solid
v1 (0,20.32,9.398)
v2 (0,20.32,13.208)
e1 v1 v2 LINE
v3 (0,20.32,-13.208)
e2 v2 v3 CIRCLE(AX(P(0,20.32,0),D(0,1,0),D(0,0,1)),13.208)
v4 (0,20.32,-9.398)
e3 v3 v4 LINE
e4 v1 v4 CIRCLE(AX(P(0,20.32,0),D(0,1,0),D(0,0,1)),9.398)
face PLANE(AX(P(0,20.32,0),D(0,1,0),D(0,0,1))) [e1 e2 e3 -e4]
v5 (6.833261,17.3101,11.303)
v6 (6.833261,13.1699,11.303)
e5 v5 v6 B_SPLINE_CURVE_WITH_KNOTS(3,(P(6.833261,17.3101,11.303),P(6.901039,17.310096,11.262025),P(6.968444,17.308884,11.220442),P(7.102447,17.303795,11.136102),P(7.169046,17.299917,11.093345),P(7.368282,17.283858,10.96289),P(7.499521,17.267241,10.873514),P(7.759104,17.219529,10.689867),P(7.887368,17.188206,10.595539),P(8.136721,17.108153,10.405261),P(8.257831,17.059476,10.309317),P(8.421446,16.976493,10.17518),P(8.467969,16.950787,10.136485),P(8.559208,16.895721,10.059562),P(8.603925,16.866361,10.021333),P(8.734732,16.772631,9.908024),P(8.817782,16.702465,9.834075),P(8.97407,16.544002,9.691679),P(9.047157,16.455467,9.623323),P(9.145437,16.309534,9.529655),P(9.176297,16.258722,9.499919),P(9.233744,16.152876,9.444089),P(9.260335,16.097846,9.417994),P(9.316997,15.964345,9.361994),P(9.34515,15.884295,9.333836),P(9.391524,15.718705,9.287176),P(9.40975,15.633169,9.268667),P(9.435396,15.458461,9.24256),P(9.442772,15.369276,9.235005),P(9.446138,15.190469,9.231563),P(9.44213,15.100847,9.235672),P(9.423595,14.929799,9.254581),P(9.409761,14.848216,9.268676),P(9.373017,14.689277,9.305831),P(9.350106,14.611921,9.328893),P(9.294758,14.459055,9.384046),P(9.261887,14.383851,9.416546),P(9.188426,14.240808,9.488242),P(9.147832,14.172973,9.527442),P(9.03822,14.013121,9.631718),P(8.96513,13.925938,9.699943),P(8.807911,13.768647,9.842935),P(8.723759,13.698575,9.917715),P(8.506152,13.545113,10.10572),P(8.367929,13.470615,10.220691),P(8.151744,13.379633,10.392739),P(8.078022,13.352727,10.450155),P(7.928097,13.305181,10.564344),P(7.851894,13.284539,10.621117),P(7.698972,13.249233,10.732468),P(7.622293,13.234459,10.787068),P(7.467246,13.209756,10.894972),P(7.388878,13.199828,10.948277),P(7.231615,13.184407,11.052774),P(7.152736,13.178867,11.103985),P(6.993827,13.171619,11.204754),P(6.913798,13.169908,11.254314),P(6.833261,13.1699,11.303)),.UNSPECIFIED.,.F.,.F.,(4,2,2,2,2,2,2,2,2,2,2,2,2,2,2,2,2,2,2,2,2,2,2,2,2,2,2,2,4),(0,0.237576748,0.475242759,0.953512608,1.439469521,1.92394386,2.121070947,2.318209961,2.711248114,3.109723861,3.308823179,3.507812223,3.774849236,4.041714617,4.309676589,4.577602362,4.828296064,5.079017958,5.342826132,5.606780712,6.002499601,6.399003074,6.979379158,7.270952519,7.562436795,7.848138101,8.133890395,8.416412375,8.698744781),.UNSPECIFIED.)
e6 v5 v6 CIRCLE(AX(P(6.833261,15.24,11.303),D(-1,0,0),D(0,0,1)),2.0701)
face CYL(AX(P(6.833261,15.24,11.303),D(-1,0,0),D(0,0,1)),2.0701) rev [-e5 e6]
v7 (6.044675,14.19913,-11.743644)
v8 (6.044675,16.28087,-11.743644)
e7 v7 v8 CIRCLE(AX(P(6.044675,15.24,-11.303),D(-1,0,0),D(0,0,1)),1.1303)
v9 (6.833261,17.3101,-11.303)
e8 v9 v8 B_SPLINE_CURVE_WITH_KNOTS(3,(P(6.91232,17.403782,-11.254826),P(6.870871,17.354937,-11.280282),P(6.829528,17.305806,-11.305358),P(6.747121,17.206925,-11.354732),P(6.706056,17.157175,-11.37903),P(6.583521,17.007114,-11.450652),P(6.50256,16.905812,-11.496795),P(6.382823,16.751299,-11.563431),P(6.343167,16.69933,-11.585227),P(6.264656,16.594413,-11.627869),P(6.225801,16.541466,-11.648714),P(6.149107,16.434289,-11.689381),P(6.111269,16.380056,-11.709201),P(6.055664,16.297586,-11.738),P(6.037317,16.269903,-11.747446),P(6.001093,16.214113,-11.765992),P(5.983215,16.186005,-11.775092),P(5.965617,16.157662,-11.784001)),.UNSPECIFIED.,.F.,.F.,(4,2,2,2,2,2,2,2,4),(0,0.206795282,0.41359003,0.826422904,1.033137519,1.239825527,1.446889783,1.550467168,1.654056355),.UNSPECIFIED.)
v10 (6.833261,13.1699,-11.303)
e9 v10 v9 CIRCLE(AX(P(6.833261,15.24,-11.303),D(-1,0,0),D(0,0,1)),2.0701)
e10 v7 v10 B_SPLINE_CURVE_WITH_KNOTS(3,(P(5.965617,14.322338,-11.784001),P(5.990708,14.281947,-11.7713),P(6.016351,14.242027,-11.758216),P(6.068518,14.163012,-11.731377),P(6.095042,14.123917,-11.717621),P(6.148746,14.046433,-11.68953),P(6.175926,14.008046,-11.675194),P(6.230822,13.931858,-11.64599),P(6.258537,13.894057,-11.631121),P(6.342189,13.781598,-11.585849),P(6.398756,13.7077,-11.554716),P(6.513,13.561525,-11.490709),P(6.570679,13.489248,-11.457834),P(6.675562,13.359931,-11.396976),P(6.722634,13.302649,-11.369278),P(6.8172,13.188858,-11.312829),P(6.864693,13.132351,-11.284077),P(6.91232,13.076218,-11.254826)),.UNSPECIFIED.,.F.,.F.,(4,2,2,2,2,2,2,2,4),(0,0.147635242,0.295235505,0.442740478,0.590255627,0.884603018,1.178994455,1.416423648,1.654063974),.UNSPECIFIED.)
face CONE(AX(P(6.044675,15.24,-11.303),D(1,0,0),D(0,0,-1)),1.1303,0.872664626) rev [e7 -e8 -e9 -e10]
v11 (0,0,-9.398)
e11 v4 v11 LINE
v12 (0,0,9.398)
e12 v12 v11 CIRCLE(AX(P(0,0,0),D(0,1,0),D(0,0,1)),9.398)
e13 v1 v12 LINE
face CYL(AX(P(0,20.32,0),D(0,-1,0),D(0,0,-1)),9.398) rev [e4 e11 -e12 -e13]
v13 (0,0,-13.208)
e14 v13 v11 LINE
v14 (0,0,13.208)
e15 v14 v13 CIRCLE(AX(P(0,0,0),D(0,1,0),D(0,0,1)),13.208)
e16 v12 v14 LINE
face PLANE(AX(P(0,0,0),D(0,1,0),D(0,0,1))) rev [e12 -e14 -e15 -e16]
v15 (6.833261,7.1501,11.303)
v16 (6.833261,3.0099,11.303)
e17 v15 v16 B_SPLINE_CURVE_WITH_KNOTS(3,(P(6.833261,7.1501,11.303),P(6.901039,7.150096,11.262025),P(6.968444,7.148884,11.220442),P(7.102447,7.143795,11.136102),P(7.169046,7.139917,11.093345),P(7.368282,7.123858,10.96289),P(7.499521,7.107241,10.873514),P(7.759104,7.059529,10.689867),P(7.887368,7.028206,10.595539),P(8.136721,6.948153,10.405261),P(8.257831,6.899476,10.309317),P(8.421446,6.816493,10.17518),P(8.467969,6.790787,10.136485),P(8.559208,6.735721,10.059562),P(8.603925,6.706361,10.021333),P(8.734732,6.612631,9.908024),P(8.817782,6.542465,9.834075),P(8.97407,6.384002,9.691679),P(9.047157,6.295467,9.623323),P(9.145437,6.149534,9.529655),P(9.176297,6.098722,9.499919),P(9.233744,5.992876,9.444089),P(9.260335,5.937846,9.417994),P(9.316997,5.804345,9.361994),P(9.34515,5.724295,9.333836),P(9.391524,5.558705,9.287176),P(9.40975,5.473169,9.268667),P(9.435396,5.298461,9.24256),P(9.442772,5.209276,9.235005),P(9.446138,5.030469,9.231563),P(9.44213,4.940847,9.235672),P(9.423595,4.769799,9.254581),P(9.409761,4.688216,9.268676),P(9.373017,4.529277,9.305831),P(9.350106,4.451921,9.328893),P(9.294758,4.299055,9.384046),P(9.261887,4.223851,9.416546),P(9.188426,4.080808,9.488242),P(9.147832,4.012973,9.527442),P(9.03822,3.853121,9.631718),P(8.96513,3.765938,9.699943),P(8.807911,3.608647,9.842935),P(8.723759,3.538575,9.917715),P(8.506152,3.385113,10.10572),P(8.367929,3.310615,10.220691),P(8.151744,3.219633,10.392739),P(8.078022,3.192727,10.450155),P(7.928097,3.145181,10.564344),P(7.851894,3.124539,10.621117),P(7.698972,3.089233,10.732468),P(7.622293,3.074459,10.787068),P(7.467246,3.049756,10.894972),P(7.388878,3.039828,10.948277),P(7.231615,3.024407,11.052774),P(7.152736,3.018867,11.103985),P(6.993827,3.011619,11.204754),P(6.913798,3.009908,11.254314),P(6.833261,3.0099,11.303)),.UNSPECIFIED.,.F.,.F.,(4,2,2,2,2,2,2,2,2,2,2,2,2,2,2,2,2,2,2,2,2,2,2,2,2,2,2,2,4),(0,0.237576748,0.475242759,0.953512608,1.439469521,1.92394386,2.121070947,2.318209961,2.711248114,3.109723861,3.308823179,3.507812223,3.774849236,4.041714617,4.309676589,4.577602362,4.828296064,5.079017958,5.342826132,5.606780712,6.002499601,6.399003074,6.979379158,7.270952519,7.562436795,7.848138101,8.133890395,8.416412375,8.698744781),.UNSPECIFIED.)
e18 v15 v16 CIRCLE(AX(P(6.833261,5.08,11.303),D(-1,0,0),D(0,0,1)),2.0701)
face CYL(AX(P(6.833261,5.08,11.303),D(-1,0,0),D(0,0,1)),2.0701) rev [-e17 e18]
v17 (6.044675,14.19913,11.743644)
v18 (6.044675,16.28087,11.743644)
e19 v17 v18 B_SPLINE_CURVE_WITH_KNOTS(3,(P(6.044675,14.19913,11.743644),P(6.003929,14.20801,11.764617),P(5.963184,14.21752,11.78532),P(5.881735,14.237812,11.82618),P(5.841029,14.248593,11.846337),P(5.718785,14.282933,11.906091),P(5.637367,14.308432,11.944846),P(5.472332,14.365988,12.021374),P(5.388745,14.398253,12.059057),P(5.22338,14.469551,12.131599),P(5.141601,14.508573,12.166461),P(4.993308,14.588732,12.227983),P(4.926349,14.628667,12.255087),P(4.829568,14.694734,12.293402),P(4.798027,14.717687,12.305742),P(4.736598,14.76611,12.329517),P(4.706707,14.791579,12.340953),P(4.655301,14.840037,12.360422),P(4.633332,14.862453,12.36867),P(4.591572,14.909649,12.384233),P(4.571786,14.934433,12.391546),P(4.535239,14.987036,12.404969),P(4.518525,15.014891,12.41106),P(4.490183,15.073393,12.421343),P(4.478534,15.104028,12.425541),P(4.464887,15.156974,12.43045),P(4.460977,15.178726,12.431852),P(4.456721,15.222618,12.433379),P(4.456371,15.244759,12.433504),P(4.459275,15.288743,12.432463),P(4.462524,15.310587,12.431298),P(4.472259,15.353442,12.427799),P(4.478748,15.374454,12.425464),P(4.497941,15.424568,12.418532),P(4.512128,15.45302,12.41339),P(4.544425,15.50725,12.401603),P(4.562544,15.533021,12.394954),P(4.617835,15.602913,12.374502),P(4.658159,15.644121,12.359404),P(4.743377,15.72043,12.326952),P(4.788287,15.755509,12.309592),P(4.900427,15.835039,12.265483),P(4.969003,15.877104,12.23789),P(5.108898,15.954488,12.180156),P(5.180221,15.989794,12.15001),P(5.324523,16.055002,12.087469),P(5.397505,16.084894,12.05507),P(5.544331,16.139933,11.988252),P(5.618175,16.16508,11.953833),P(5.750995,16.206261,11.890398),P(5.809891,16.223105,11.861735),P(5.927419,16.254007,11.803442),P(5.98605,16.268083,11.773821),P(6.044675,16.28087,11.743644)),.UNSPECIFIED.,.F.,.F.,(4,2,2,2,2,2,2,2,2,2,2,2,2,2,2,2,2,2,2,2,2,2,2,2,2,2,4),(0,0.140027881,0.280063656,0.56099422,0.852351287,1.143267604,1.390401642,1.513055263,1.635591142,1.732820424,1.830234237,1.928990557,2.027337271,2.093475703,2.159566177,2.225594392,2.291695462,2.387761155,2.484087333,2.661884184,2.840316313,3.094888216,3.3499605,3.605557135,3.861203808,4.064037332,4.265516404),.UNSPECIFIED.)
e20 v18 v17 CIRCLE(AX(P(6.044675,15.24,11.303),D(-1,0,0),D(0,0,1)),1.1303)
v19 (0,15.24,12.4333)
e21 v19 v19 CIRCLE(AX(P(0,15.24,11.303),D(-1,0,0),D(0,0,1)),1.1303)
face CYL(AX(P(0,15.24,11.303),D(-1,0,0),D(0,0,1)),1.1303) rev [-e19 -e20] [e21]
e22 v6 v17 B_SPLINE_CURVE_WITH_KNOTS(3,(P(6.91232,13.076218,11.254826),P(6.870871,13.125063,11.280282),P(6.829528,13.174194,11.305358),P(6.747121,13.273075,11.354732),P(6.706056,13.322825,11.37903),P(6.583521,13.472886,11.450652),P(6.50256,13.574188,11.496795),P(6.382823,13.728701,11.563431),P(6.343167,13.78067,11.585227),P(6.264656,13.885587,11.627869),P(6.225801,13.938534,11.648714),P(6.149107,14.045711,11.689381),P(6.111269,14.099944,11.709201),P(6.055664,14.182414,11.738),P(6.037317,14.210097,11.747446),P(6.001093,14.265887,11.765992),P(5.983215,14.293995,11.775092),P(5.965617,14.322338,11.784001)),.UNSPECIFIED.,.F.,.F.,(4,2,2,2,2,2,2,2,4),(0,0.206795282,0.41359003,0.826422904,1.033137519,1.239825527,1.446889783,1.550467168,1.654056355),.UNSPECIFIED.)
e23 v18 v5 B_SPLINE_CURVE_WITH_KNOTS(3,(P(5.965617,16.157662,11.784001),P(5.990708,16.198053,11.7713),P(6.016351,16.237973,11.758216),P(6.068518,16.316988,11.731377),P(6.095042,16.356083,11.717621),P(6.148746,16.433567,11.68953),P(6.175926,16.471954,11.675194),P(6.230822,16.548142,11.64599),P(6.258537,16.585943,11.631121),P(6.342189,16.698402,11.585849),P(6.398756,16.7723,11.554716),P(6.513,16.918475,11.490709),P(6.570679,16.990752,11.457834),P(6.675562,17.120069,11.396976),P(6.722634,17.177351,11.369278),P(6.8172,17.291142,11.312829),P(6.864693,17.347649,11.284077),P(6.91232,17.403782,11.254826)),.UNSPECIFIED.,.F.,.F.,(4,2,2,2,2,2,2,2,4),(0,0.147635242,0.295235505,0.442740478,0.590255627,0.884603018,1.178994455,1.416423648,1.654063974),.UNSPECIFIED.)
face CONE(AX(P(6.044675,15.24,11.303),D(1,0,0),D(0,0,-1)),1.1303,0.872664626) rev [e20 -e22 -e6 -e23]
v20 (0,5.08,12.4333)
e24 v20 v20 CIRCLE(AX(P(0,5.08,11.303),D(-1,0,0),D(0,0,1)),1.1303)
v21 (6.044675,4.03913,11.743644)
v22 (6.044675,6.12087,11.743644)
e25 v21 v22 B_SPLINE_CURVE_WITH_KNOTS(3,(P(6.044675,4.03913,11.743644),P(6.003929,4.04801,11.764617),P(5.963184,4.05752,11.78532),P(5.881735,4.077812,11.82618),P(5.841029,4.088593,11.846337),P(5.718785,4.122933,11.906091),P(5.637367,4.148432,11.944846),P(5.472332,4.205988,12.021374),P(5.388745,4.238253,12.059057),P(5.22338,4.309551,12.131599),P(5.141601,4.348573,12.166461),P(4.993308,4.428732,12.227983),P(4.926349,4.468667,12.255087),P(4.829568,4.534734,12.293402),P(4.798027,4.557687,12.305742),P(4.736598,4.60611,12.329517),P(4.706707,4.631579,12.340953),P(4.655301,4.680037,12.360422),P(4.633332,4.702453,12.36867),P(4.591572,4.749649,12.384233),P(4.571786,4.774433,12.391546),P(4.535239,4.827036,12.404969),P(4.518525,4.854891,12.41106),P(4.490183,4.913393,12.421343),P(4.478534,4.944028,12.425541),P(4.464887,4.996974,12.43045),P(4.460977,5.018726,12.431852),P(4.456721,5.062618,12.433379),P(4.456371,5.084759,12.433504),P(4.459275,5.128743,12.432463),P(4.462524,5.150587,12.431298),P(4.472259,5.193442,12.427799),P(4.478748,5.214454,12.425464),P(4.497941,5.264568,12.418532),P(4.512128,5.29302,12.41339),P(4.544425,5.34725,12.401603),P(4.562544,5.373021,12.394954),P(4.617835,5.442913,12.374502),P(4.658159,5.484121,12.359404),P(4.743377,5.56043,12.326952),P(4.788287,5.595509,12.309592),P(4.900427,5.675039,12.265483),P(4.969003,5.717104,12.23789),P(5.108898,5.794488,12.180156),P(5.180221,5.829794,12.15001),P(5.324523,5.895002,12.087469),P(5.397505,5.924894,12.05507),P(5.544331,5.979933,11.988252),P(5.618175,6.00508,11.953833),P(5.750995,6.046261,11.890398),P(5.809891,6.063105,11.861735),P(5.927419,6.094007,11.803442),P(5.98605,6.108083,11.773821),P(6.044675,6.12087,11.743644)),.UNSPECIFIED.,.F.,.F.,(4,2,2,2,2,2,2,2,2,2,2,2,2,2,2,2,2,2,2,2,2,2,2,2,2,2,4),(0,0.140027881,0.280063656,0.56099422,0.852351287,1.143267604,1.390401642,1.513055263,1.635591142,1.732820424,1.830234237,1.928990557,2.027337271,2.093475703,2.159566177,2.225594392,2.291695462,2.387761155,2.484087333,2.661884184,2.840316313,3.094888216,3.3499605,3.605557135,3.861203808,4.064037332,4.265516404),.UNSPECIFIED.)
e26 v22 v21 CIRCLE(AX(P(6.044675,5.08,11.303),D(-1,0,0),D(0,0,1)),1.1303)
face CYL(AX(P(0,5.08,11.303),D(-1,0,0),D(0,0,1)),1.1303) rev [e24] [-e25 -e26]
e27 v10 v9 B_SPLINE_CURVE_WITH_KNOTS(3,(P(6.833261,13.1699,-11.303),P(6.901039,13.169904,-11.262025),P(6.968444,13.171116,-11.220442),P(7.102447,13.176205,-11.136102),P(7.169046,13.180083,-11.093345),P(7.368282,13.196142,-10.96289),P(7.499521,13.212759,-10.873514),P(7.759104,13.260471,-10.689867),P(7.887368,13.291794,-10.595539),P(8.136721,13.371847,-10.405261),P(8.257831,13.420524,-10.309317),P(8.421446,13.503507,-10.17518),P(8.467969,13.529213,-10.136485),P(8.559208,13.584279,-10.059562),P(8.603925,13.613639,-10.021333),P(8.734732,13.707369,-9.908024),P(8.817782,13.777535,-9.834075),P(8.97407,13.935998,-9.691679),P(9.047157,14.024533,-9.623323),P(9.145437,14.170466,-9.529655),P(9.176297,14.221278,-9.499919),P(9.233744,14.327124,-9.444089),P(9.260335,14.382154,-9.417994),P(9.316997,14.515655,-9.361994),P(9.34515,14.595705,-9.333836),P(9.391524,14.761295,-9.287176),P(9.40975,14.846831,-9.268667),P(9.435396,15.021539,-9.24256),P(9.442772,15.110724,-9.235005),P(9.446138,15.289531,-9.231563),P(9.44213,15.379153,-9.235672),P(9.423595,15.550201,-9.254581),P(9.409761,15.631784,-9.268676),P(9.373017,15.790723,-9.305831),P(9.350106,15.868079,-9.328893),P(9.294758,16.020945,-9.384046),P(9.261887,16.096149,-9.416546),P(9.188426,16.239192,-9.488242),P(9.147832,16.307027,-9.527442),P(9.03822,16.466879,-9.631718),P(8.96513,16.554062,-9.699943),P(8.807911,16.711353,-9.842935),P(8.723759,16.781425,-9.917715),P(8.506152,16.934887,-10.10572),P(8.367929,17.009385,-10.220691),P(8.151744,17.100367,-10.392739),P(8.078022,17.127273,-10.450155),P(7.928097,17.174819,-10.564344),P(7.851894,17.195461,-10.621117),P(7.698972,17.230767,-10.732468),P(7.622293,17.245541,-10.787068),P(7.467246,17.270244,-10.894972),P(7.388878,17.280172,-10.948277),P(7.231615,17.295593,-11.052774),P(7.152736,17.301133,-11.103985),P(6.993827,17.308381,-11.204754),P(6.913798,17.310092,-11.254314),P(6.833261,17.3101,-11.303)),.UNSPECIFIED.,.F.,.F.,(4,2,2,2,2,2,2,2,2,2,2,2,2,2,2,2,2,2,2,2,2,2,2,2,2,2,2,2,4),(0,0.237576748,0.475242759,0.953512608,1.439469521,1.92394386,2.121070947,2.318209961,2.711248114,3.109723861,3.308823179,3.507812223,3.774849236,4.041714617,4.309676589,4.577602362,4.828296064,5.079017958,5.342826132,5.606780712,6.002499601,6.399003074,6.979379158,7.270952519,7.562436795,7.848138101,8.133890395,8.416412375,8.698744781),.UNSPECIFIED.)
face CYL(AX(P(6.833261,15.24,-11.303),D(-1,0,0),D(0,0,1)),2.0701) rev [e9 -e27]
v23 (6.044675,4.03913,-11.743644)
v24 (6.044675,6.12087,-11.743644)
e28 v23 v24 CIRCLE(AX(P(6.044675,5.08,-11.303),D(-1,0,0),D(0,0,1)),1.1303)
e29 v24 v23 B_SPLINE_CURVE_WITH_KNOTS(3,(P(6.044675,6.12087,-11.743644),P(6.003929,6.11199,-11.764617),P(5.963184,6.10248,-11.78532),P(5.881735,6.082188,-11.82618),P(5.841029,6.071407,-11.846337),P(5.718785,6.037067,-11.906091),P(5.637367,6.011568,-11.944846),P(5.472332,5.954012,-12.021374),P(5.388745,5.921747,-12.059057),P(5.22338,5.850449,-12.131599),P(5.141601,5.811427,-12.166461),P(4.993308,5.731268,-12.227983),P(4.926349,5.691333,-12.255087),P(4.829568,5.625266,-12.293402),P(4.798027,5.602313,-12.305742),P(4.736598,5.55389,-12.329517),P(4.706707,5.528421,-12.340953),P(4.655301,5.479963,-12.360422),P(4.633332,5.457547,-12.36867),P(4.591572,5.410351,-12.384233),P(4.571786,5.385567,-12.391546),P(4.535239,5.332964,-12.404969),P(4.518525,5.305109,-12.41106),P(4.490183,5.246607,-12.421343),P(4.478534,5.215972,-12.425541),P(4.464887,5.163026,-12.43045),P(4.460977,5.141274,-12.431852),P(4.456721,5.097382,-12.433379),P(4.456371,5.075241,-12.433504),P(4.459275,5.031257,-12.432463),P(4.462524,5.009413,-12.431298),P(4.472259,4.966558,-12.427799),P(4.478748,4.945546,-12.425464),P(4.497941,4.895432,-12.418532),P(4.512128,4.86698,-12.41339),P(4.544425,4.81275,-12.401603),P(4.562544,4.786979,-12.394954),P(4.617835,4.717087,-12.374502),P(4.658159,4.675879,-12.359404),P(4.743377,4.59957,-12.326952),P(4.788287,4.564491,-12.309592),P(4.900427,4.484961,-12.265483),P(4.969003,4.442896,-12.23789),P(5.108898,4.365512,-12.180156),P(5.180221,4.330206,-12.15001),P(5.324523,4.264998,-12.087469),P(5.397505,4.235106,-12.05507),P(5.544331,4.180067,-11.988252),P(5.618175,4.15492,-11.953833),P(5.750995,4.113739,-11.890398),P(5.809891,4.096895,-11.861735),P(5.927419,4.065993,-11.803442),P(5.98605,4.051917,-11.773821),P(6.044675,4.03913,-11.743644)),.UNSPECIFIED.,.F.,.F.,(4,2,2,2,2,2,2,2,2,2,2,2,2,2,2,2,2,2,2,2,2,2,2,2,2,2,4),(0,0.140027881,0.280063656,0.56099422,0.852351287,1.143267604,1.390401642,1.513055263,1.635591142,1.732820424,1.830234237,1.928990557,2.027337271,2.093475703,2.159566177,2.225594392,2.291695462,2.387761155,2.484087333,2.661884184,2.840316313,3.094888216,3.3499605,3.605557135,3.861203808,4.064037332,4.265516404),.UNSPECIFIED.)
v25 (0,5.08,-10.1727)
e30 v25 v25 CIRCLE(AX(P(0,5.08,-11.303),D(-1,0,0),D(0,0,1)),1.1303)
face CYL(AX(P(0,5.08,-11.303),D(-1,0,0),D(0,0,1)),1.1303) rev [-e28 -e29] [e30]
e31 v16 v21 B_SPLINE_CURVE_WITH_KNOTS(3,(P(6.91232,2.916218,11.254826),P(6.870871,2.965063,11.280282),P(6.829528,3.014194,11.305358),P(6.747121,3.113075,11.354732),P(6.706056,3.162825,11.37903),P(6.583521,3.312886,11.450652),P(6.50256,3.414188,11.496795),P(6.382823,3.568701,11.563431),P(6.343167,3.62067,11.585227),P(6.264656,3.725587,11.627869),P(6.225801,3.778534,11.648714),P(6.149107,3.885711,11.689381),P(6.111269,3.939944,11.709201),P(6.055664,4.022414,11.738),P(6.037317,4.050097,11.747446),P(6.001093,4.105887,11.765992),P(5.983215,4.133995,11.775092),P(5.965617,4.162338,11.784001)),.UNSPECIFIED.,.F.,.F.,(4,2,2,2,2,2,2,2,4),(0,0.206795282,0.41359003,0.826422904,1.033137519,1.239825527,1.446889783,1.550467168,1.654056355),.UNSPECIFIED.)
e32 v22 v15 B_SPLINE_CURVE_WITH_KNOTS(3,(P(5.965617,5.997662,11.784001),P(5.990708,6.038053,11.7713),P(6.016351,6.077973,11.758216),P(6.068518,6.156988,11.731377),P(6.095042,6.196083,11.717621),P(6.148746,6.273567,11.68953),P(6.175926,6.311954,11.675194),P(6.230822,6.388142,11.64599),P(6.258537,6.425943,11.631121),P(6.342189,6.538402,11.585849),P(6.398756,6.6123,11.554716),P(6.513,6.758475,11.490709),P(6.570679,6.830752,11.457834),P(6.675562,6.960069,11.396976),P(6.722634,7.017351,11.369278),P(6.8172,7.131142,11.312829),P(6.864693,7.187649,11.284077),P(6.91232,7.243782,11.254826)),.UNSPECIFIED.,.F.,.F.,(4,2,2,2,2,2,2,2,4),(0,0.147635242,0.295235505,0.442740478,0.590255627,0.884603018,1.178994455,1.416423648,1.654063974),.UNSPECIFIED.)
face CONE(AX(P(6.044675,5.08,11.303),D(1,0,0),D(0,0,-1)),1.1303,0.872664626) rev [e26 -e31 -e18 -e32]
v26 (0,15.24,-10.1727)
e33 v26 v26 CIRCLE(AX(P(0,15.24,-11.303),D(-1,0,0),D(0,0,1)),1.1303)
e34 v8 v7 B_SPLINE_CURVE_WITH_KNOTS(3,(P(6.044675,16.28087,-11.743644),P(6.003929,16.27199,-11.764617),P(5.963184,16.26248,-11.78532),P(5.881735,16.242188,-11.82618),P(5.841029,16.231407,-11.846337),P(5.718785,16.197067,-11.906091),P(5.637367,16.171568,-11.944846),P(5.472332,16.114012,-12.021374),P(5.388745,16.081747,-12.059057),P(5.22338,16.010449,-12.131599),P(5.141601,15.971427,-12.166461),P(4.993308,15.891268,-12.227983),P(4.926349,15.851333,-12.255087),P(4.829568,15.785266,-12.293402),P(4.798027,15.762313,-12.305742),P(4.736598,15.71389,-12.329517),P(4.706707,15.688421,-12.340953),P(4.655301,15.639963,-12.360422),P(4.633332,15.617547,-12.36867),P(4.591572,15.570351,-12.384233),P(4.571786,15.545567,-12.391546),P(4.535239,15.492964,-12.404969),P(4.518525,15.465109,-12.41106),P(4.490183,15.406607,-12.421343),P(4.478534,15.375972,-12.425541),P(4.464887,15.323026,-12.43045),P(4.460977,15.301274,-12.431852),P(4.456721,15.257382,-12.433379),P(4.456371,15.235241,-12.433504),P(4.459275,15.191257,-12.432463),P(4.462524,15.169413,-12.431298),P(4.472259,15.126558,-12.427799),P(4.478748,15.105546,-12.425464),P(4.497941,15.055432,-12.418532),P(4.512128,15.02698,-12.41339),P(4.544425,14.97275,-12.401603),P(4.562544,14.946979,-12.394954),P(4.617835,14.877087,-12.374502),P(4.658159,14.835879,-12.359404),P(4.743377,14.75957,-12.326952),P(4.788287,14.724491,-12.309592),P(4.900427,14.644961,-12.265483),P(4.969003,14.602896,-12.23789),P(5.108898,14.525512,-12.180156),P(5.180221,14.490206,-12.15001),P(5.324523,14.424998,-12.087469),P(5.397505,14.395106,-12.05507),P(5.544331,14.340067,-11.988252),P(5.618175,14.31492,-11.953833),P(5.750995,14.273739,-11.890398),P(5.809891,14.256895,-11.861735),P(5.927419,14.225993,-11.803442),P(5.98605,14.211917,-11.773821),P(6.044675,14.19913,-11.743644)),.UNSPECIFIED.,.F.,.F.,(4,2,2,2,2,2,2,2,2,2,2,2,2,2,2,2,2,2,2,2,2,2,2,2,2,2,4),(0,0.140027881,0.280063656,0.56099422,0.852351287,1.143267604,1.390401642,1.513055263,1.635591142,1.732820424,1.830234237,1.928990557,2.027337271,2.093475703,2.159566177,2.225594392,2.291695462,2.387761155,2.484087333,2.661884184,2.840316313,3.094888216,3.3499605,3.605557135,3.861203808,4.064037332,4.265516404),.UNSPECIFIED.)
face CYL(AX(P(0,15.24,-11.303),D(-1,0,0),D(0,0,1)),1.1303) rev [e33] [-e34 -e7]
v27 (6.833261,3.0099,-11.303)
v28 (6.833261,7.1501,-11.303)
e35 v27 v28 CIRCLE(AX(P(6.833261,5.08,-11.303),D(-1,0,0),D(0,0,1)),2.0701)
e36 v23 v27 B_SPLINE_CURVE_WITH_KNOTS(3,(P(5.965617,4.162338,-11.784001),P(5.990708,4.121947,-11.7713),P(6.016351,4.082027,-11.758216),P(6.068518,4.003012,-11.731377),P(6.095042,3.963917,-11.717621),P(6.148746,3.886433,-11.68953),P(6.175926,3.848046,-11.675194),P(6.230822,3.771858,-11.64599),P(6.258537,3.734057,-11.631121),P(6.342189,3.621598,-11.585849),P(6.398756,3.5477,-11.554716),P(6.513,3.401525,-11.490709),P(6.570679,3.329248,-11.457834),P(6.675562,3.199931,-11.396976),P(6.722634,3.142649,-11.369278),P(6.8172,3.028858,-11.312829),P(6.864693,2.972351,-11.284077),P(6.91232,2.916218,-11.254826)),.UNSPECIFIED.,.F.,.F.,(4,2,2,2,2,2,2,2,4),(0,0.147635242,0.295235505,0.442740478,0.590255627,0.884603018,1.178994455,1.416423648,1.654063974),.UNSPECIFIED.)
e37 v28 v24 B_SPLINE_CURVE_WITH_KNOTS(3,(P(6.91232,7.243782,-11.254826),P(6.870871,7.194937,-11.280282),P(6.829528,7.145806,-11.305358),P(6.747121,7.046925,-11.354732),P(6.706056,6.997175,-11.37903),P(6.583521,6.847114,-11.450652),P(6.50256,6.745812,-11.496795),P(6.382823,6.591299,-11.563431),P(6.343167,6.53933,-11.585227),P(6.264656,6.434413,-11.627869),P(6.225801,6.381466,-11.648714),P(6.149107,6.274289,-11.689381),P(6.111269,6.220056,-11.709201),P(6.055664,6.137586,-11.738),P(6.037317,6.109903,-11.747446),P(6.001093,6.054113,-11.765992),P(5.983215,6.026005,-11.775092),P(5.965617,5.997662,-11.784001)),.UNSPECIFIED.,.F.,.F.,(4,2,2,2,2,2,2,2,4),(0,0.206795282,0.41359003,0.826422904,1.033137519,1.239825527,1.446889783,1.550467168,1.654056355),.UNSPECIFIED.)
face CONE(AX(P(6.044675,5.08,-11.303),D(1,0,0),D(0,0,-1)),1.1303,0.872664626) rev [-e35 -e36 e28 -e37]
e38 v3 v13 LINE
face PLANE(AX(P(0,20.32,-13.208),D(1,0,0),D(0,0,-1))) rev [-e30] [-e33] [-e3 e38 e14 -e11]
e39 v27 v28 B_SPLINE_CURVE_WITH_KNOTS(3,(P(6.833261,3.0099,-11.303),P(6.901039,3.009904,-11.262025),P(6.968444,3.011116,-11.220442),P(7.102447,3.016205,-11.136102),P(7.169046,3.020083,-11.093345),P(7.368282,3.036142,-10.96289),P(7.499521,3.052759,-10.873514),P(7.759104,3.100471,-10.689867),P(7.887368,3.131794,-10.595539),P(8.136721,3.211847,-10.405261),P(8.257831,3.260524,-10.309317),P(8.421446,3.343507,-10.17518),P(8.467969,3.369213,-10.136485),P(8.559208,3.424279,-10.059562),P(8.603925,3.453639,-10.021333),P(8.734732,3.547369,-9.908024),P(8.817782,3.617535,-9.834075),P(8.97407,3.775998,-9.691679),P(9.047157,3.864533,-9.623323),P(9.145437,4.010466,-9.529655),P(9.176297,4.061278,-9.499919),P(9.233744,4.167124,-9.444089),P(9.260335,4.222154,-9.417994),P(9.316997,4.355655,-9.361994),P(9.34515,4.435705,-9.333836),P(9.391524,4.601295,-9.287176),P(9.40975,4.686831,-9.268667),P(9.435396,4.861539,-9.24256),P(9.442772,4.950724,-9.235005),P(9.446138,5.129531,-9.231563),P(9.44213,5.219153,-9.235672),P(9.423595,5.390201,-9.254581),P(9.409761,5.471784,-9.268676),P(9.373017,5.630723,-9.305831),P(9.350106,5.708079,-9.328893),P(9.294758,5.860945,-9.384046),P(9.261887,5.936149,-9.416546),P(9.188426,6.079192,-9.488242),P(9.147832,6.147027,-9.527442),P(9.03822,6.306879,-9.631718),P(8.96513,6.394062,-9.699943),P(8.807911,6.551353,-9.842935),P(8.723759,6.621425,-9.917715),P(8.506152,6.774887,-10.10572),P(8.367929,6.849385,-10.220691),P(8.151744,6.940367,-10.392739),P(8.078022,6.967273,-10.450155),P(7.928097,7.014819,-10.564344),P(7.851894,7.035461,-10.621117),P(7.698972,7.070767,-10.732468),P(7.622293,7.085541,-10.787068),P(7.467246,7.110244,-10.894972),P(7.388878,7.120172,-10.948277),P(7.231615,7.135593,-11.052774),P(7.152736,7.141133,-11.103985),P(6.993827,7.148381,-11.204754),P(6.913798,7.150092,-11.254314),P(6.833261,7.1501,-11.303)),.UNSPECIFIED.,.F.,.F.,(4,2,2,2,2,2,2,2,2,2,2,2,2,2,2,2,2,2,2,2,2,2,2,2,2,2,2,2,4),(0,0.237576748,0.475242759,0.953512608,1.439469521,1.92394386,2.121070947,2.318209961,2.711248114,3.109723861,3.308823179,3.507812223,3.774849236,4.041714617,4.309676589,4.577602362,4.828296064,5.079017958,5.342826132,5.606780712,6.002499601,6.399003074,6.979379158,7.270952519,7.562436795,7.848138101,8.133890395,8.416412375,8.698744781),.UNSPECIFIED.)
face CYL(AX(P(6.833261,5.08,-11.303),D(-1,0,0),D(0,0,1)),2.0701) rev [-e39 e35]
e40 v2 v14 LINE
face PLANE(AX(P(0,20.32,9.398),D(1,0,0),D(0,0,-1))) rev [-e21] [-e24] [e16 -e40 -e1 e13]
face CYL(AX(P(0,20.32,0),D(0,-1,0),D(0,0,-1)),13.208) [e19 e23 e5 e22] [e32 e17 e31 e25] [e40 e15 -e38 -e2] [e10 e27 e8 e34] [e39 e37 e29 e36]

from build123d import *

# Parameters (mm, degrees)
BOSS_EXTRUDE1_DEPTH = 20.32


# Read off the part's stored shape, not the designer's step: #2 Clearance Hole1
with BuildPart() as part:
    # Sketch1 → Boss-Extrude1 (new body)
    with BuildSketch(Plane(origin=(0, 0, 0), x_dir=(1, 0, 0), z_dir=(0, 1, 0))):
        with BuildLine():
            Line((0, 13.208), (0, 9.398))
            ThreePointArc((0, 9.398), (9.398, 0), (0, -9.398))
            Line((0, -9.398), (0, -13.208))
            ThreePointArc((0, -13.208), (13.208, 0), (0, 13.208))
        make_face()
    extrude(amount=BOSS_EXTRUDE1_DEPTH)

    # #2 Clearance Hole1 outline → #2 Clearance Hole1 (revolve, cut)
    with BuildSketch(Plane(origin=(0, 5.08, -11.303), x_dir=(0, 1, 0), z_dir=(0, 0, -1))):
        Polygon((2.0701, 6.833260935), (2.0701, 9.445172288), (0, 9.445172288), (0, 0), (1.1303, 0), (1.1303, 6.044675101), align=None)
    revolve(axis=Axis((0, 5.08, -11.303), (1, 0, 0)), mode=Mode.SUBTRACT)

    # 2 Clearance Hole1 2 outline → 2 Clearance Hole1 2 (revolve, cut)
    with BuildSketch(Plane(origin=(0, 5.08, 11.303), x_dir=(0, 1, 0), z_dir=(0, 0, -1))):
        Polygon((2.0701, 9.445172288), (0, 9.445172288), (0, 0), (1.1303, 0), (1.1303, 6.044675101), (2.0701, 6.833260935), align=None)
    revolve(axis=Axis((0, 5.08, 11.303), (1, 0, 0)), mode=Mode.SUBTRACT)

    # 2 Clearance Hole1 3 outline → 2 Clearance Hole1 3 (revolve, cut)
    with BuildSketch(Plane(origin=(0, 15.24, 11.303), x_dir=(0, 1, 0), z_dir=(0, 0, -1))):
        Polygon((2.0701, 9.445172288), (0, 9.445172288), (0, 0), (1.1303, 0), (1.1303, 6.044675101), (2.0701, 6.833260935), align=None)
    revolve(axis=Axis((0, 15.24, 11.303), (1, 0, 0)), mode=Mode.SUBTRACT)

    # 2 Clearance Hole1 4 outline → 2 Clearance Hole1 4 (revolve, cut)
    with BuildSketch(Plane(origin=(0, 15.24, -11.303), x_dir=(0, 1, 0), z_dir=(0, 0, -1))):
        Polygon((2.0701, 9.445172288), (0, 9.445172288), (0, 0), (1.1303, 0), (1.1303, 6.044675101), (2.0701, 6.833260935), align=None)
    revolve(axis=Axis((0, 15.24, -11.303), (1, 0, 0)), mode=Mode.SUBTRACT)


solid = part.part
